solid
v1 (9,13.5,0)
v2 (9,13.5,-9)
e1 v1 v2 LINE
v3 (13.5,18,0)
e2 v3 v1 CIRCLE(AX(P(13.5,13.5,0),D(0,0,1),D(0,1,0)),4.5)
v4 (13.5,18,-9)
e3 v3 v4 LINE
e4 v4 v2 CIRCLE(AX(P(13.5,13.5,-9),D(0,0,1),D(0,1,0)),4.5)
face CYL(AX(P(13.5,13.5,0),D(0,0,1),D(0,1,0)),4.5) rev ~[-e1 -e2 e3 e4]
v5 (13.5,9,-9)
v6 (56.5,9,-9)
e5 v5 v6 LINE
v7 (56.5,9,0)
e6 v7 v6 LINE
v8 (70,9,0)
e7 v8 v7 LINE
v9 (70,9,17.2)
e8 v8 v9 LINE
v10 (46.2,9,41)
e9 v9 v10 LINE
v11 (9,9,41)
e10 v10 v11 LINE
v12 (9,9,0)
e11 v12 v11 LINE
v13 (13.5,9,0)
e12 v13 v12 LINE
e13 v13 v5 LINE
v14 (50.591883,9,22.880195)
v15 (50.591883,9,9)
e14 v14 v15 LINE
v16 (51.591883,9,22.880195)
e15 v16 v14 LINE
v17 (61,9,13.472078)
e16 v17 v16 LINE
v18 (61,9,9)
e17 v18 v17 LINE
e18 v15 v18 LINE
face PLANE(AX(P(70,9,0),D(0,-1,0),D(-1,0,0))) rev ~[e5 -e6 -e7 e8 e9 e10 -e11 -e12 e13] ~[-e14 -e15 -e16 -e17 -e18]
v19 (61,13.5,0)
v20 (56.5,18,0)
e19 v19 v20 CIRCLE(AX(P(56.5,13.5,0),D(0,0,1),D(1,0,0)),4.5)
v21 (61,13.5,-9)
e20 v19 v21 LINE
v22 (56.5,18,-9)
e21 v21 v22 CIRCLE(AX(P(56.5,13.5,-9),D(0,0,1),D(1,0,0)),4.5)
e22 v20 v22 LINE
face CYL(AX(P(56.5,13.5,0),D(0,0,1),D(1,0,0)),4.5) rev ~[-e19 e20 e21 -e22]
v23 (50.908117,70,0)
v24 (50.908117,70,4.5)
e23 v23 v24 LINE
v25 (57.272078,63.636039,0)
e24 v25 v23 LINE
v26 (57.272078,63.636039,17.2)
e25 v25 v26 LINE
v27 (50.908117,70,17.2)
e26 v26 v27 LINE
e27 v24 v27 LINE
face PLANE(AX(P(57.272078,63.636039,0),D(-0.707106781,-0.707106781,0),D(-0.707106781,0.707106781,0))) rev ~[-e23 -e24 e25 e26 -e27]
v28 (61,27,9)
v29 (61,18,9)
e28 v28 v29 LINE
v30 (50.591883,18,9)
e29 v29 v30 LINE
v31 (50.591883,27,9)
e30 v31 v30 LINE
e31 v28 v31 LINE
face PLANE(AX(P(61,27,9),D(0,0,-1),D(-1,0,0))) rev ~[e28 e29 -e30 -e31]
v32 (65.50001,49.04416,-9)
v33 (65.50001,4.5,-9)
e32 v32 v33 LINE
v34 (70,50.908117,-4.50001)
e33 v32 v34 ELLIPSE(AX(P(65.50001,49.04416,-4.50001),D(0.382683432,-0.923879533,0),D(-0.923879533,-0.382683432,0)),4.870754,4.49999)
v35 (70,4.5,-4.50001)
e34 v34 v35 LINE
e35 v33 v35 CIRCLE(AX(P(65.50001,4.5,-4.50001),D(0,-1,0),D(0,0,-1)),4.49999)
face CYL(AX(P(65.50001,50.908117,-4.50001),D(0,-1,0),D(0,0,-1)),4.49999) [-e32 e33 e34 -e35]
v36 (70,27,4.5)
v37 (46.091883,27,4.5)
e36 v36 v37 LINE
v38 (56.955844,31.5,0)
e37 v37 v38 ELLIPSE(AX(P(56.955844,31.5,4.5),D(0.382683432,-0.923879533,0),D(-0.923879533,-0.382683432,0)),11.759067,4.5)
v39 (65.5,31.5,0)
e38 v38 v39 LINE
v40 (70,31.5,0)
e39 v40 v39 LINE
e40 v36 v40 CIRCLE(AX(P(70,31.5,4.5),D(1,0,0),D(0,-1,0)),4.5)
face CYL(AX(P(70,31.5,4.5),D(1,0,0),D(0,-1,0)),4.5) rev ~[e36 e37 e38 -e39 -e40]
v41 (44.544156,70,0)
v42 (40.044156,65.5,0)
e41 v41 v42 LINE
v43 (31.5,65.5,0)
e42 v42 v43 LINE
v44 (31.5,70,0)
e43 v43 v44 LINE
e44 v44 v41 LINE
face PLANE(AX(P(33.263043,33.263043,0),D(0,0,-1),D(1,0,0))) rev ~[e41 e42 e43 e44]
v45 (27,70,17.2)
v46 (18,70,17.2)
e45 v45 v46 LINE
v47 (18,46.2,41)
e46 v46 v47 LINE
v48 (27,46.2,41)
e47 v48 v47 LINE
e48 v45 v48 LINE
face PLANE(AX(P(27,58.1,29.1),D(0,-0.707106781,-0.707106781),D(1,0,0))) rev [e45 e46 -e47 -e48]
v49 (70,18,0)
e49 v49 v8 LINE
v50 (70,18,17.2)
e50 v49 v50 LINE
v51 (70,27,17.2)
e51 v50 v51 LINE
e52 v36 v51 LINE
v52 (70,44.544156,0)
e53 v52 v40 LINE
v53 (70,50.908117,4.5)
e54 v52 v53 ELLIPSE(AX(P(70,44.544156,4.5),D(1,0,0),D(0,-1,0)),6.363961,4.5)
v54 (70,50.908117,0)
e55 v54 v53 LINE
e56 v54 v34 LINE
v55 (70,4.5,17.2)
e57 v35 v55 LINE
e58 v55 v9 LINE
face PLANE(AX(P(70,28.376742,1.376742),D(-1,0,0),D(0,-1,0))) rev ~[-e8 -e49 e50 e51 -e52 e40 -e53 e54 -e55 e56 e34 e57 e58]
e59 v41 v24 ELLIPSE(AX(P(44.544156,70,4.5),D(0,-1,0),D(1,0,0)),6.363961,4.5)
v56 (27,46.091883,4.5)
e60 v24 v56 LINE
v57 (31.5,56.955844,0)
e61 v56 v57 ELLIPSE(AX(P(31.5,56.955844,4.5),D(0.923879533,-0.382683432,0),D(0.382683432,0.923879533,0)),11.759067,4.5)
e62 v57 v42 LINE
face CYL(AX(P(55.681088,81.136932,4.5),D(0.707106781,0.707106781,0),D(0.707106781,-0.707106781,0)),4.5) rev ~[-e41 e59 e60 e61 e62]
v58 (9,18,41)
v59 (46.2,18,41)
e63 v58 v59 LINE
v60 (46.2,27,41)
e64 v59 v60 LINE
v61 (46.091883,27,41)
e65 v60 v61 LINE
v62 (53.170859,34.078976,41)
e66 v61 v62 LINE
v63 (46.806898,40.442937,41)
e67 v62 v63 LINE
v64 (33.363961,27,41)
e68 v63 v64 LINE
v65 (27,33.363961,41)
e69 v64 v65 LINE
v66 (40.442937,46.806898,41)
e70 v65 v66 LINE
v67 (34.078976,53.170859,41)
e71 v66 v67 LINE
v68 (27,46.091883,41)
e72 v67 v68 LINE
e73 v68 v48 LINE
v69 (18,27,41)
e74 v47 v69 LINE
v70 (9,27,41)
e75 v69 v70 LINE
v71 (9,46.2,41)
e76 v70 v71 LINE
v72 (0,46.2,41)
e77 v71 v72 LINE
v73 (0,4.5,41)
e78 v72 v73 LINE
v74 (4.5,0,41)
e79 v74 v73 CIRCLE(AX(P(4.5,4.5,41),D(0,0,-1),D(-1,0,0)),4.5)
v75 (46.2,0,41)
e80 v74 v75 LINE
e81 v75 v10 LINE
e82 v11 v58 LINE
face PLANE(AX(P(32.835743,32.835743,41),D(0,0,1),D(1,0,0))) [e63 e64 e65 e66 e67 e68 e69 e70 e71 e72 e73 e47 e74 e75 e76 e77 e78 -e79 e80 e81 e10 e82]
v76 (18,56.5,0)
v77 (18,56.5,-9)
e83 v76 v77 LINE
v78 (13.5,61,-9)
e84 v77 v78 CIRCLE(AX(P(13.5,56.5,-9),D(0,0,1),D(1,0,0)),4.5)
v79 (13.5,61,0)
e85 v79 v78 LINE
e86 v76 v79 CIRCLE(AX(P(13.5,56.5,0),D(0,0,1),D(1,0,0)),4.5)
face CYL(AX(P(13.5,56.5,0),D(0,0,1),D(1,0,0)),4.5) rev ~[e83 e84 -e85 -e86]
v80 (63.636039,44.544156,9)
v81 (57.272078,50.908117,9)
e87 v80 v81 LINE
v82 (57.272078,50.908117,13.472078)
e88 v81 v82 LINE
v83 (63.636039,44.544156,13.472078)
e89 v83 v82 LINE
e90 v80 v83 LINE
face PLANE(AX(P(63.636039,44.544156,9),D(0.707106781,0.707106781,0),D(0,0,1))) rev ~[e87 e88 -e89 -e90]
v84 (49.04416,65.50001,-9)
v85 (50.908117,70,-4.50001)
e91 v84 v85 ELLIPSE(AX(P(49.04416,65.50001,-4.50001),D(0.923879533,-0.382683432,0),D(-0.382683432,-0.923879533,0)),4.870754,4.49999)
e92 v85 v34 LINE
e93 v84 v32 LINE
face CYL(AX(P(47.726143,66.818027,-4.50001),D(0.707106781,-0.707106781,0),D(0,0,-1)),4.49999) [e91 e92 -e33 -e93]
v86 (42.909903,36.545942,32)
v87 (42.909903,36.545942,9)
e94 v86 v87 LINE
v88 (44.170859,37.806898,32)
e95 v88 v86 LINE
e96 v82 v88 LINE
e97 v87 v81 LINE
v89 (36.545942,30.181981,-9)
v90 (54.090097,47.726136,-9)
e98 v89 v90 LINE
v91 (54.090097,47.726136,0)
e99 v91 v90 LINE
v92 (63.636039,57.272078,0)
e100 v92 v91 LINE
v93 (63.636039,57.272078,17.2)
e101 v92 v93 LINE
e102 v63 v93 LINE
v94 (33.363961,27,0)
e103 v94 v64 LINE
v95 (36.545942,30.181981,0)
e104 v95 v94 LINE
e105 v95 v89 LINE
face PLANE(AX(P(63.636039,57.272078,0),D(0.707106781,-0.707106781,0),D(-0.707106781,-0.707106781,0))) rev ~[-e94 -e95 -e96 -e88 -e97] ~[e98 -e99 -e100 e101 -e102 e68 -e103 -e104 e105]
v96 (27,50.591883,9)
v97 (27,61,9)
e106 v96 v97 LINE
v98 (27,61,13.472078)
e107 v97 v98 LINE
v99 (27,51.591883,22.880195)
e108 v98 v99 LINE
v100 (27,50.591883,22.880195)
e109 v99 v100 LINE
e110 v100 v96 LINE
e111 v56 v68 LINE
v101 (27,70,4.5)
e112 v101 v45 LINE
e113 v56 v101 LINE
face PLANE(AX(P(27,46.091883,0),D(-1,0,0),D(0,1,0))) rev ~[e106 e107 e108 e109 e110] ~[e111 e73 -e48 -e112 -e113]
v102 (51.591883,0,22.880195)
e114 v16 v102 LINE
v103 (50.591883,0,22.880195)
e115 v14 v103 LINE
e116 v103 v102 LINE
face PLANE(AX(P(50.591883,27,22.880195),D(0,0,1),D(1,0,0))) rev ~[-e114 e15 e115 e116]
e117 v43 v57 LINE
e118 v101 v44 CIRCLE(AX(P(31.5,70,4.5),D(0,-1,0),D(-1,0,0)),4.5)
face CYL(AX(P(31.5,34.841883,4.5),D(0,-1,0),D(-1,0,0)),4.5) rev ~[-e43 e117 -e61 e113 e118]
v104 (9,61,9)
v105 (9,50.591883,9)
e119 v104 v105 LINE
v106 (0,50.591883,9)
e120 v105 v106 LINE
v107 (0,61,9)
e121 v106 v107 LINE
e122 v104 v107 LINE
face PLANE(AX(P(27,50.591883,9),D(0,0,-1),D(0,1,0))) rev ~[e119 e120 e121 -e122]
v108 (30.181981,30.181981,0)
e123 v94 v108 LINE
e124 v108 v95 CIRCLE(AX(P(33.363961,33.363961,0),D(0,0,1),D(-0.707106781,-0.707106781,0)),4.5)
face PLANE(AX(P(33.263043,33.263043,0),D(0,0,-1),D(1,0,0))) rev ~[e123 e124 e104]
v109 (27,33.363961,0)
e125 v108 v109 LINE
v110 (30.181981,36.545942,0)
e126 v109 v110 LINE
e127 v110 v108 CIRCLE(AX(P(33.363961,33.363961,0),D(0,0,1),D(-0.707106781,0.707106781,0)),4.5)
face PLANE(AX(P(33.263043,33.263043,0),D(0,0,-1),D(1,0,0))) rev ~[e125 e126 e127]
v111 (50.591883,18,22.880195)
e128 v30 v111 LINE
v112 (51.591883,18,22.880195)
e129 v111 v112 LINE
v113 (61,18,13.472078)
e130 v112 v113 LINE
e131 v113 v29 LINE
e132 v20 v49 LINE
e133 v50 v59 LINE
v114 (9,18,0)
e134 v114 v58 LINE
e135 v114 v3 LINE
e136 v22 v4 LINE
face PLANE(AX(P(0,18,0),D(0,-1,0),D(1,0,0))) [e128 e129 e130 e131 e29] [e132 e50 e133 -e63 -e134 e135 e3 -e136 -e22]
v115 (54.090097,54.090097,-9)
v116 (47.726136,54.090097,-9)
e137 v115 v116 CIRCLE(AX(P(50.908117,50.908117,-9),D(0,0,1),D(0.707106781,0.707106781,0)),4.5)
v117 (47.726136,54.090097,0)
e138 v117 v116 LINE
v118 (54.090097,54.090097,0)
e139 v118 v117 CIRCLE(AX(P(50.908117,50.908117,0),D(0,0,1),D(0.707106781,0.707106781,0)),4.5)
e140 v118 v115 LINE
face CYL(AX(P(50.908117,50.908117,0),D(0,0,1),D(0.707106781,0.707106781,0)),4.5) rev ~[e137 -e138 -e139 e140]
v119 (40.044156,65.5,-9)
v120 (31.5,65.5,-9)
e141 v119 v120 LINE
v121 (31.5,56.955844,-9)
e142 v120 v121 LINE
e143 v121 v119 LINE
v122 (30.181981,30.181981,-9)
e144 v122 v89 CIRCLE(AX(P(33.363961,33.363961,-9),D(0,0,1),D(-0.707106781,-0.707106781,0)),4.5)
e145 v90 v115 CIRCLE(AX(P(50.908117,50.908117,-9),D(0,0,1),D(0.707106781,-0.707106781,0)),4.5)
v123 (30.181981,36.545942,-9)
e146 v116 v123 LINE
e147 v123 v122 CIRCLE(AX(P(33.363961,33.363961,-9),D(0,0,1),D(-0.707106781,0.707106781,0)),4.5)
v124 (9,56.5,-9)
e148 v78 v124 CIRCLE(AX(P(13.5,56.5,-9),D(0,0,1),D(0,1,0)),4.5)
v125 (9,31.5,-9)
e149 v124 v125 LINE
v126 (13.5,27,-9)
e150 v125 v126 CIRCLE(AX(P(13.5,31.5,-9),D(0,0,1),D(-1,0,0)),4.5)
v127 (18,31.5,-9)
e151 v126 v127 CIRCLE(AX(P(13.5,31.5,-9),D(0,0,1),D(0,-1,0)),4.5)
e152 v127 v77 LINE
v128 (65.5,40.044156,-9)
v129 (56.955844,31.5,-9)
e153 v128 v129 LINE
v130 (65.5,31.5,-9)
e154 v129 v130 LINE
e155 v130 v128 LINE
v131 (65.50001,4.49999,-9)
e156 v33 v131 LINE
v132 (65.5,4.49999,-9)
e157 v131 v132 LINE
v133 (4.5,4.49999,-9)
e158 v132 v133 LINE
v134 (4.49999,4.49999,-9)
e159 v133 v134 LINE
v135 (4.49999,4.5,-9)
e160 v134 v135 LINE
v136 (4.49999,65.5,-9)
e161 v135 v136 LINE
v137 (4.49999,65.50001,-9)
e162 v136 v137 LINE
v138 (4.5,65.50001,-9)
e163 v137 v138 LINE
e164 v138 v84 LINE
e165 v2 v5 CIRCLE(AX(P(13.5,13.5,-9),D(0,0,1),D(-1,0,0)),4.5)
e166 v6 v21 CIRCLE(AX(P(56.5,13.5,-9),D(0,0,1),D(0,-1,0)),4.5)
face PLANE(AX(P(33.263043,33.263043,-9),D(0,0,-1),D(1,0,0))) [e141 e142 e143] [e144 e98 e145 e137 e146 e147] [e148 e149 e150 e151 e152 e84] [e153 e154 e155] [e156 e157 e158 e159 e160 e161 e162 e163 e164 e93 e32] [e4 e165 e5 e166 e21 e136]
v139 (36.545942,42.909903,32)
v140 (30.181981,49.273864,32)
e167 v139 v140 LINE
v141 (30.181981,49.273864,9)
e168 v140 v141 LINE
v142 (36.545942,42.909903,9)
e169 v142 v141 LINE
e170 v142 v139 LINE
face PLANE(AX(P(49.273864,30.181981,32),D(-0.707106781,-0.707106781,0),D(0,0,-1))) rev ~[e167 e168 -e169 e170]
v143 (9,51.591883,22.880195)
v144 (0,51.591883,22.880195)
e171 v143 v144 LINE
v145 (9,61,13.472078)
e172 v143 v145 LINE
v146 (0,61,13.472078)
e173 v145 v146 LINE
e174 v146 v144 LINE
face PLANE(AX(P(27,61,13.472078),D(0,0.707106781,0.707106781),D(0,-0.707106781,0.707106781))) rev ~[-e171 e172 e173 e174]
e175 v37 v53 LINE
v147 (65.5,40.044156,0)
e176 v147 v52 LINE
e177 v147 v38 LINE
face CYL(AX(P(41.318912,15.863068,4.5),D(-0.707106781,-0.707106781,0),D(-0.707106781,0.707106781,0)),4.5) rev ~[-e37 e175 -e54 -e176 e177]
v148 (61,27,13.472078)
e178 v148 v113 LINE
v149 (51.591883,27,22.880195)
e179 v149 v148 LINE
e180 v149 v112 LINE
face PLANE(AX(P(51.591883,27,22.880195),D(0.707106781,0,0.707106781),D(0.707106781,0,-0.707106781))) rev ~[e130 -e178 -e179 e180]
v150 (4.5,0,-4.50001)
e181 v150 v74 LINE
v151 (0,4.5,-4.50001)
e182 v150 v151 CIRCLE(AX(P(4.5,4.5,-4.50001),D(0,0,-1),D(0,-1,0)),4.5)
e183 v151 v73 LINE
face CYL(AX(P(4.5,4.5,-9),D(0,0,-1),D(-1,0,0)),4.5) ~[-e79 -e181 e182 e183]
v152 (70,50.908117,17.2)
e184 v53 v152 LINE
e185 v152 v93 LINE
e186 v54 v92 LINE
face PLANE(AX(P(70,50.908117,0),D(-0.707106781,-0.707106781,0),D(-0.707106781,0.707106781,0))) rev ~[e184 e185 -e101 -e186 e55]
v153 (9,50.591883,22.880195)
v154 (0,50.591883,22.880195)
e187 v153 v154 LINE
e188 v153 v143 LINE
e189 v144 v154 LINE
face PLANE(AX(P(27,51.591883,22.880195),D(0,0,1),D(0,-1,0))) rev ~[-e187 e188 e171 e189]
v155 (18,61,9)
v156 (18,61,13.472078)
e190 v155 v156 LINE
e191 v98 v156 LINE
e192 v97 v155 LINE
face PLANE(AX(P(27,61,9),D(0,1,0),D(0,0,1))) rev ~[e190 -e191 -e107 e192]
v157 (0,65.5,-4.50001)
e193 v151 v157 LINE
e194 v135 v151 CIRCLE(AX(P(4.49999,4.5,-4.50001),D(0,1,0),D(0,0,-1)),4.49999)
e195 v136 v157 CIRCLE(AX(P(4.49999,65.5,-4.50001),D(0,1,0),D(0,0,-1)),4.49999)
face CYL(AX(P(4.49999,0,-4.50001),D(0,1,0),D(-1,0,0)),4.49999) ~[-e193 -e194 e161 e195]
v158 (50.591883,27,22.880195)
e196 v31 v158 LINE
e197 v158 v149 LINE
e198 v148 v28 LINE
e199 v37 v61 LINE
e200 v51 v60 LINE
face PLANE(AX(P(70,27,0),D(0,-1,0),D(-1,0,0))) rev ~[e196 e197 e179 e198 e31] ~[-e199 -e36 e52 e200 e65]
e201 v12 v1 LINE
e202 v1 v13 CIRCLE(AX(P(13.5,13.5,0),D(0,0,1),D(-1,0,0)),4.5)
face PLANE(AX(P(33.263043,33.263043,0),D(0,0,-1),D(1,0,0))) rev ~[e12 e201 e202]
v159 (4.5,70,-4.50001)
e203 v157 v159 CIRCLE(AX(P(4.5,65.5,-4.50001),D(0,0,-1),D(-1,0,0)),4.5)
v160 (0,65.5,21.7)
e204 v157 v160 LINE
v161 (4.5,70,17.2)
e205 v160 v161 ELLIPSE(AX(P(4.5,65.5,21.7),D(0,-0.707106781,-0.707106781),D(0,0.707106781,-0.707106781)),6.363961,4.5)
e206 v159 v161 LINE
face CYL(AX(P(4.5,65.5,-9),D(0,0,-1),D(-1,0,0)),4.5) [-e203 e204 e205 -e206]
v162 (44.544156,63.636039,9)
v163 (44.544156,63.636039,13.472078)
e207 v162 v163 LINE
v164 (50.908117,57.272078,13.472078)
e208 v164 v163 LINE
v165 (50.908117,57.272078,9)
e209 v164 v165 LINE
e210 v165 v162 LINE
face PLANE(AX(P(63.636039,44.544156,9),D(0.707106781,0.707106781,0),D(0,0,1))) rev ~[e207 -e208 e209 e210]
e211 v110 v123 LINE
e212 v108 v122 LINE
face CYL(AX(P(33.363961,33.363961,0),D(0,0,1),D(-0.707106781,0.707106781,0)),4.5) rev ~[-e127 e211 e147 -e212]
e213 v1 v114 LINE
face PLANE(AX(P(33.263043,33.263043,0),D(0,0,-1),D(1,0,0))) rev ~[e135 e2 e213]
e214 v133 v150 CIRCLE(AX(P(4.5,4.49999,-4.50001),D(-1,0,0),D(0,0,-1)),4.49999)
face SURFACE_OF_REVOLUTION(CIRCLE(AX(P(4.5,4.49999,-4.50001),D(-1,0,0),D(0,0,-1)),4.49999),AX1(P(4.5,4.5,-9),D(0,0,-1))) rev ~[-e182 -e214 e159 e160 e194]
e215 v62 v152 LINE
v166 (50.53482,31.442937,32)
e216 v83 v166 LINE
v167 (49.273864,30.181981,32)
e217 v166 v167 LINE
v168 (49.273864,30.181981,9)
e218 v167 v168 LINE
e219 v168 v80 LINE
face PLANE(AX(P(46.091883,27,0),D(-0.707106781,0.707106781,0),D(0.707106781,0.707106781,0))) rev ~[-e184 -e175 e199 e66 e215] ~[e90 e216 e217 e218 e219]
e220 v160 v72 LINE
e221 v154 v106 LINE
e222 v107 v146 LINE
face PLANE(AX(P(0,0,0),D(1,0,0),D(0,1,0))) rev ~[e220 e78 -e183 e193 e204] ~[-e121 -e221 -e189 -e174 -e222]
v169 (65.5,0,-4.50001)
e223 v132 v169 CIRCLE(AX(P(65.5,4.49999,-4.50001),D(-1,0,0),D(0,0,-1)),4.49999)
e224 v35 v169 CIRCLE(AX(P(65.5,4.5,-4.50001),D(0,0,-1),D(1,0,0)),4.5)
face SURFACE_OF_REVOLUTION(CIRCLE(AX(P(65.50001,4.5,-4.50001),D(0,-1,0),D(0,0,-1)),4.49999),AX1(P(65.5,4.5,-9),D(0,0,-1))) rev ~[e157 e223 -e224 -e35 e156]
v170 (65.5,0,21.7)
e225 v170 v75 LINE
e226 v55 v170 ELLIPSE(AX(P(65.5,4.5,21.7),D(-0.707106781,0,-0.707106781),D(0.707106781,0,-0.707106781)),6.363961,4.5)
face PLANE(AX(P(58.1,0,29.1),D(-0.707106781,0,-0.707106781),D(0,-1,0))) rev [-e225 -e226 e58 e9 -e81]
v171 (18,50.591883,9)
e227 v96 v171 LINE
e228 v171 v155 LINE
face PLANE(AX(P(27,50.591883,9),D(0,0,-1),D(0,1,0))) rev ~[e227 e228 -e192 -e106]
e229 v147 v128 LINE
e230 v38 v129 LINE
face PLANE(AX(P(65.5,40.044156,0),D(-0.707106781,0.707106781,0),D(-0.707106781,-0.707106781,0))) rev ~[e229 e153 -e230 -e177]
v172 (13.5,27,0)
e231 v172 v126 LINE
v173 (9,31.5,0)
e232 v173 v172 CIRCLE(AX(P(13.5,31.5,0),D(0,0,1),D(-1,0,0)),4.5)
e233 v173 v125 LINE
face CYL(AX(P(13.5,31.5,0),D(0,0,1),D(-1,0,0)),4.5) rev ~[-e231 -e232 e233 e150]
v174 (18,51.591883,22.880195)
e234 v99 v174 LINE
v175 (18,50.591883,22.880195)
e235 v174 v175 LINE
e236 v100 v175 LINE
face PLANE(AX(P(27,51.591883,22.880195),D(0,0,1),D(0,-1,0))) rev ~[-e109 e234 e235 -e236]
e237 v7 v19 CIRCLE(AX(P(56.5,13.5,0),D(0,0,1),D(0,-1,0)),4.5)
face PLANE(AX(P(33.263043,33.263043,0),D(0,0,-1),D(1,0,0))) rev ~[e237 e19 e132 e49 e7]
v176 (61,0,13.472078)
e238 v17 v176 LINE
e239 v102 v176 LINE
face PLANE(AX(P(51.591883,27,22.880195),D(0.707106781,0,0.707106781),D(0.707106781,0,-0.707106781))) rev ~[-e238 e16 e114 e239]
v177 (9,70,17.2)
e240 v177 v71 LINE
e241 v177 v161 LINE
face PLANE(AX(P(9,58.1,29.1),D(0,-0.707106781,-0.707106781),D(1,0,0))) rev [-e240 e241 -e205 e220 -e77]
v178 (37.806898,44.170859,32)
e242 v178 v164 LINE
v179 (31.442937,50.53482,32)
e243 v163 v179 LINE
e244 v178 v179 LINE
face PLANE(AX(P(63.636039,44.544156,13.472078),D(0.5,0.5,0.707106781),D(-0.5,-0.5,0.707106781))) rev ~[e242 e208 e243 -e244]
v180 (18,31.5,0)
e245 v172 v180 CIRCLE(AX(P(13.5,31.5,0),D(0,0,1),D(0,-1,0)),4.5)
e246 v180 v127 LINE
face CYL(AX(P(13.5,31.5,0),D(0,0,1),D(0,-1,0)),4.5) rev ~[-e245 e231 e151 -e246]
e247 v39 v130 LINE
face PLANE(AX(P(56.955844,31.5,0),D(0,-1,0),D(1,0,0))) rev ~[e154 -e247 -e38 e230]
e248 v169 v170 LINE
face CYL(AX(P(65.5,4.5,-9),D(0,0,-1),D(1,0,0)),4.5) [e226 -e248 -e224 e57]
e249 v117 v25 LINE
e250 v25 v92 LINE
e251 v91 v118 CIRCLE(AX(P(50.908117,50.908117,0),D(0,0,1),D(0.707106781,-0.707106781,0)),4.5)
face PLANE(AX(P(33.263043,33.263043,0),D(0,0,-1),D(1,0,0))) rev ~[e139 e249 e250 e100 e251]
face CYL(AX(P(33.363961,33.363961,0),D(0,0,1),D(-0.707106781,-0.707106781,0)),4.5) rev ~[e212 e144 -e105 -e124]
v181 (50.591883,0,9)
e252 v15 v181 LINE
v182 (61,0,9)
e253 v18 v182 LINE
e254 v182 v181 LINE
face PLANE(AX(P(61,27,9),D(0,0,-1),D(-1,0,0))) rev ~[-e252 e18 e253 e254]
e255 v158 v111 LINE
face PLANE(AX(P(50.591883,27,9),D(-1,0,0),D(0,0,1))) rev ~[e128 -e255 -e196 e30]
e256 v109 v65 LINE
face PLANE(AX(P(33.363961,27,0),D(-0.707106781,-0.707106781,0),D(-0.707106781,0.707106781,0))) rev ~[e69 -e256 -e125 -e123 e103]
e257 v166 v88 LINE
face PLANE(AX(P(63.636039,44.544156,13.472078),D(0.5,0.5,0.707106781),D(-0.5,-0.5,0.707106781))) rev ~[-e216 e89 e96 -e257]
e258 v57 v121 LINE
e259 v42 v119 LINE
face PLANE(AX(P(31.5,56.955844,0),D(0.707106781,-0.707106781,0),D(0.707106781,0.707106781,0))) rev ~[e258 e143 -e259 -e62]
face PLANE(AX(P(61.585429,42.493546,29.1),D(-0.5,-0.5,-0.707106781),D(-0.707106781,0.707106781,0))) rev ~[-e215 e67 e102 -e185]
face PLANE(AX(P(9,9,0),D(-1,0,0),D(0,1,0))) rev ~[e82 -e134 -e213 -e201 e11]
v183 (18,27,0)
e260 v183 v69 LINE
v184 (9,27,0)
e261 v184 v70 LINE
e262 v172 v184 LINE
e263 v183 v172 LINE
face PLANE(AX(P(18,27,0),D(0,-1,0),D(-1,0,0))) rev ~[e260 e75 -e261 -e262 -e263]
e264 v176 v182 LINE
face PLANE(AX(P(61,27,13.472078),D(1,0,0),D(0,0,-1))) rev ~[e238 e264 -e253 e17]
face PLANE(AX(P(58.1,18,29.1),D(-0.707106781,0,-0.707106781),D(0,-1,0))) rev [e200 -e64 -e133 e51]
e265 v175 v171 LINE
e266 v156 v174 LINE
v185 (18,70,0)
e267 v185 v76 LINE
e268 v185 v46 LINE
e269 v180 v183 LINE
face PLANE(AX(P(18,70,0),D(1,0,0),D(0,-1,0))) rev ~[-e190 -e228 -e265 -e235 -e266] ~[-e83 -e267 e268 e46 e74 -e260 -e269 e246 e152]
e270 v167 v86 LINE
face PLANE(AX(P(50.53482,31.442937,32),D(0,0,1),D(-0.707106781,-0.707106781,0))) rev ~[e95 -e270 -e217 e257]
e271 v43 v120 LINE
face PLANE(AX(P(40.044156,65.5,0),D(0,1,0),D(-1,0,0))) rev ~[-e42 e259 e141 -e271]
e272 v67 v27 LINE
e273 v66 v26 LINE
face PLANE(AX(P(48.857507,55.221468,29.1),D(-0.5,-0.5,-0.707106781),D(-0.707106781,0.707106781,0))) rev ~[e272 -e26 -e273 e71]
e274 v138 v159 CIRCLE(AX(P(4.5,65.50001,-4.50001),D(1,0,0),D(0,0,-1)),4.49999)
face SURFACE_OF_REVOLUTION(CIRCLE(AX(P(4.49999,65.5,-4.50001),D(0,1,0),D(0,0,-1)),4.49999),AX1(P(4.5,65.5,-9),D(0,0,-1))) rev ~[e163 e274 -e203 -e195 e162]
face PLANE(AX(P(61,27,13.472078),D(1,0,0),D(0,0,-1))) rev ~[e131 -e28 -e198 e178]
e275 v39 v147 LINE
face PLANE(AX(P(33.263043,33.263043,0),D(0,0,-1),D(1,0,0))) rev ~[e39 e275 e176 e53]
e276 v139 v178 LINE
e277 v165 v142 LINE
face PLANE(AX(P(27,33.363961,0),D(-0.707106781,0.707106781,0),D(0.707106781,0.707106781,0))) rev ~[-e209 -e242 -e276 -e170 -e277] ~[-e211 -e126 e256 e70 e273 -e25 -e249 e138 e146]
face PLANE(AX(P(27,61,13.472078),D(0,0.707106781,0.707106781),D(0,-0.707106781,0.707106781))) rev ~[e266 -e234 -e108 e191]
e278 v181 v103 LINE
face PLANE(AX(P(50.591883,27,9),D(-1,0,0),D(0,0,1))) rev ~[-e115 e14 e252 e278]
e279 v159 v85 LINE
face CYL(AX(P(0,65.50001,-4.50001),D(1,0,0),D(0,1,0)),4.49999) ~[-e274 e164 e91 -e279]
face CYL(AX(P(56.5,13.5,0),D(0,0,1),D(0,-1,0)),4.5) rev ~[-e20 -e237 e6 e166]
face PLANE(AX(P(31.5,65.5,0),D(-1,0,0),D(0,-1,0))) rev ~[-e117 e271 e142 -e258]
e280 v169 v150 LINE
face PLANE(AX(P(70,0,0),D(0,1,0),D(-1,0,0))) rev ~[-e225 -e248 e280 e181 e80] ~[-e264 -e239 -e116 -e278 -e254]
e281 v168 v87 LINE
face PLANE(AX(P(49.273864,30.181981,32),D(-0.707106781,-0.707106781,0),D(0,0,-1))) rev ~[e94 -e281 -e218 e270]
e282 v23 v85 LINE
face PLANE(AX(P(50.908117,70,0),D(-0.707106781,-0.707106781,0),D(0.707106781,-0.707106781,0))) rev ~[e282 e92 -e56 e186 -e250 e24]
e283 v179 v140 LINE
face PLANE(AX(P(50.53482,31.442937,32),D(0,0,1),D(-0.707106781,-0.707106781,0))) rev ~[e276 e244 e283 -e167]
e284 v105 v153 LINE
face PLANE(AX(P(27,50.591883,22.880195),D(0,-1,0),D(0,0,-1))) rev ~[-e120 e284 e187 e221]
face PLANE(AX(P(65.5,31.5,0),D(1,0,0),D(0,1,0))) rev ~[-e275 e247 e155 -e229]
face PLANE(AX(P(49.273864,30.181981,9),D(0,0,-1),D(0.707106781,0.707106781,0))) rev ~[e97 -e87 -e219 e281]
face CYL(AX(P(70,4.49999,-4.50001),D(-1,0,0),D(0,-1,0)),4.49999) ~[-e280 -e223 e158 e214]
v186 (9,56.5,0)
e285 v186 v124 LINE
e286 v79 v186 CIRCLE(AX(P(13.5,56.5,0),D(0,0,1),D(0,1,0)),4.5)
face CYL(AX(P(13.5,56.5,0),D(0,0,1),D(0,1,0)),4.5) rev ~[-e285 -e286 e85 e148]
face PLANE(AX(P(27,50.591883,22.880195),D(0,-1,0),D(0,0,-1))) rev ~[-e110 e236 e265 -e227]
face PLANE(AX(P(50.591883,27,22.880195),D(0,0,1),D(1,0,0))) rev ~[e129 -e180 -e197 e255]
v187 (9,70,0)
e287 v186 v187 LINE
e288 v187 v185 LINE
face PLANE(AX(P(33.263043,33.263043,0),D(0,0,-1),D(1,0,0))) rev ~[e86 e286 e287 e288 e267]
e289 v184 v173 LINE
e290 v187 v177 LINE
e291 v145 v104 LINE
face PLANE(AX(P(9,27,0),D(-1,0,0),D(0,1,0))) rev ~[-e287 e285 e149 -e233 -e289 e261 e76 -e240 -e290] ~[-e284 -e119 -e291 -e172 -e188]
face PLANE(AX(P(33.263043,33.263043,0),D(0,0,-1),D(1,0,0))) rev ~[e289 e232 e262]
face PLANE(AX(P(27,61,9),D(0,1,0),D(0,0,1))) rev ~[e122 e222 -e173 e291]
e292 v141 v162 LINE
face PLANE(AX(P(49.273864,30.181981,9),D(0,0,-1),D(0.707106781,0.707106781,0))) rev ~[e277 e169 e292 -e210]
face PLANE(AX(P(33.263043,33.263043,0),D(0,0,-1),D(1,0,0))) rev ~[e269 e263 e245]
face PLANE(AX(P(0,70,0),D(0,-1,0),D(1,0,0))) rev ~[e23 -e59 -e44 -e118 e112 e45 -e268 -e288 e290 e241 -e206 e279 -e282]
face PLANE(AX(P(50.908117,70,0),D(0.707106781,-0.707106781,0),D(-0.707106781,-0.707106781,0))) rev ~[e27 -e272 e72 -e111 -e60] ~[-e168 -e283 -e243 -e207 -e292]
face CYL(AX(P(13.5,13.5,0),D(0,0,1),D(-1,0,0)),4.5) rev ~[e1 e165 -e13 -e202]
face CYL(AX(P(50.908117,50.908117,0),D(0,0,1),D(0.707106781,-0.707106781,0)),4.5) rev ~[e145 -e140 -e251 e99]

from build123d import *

# Parameters (mm, degrees)
F1_DEPTH      = 41
F3_DEPTH      = 9
F4_SIZE       = 23.8
F5_SIZE       = 23.8
F7_DEPTH      = 9
F9_DEPTH      = 28.2
F11_DEPTH     = 34.5
F13_DEPTH     = 32.2
F14_R         = 4.49999
F15_T4_DEPTH  = 56.311183182
F15_T10_DEPTH = 35.158116908
F15_T15_DEPTH = 56.311183182
F15_T21_DEPTH = 35.158116908
F15_T23_DEPTH = 61.25
F15_T25_DEPTH = 37.45
F15_T28_ANGLE = 90
F15_T30_ANGLE = 90
F15_T32_ANGLE = 90


# Not quite as in the source:
# - a fillet or chamfer that OpenCascade refuses, or shapes differently, is made with other operations: its cross-section is extruded or revolved along the edge and cut away or added
# - a fillet or chamfer is up to 0.001 mm smaller than in the source, because OpenCascade refuses the exact size


with BuildPart() as f1:
    # F0 (on Top) → F1 (new body)
    with BuildSketch(Plane.XY):
        Polygon((0, 70), (0, 0), (70, 0), (70, 9), (9, 9), (9, 18), (70, 18), (70, 27), (46.091883092, 27), (70, 50.908116908), (63.6360389693, 57.2720779386), (33.3639610307, 27), (27, 33.3639610307), (57.2720779386, 63.6360389693), (50.908116908, 70), (27, 46.091883092), (27, 70), (18, 70), (18, 27), (9, 27), (9, 70), align=None)
    extrude(amount=F1_DEPTH)

    # F2 (on face) → F3 (join)
    with BuildSketch(Plane(origin=(0, 0, 0), x_dir=(1, 0, 0), z_dir=(0, 0, -1))):
        Polygon((70, -50.908116908), (70, 0), (0, 0), (0, -70), (50.908116908, -70), align=None)
    extrude(amount=F3_DEPTH)

    # F4
    f4_edges = [f1.edges().sort_by_distance(p)[0] for p in [
        (70, 4.5, 41),
        (70, 22.5, 41),
        (22.5, 70, 41),
        (4.5, 70, 41),
    ]]
    chamfer(f4_edges, length=F4_SIZE)

    # F5
    f5_edges = [f1.edges().sort_by_distance(p)[0] for p in [
        (66.818019, 54.090097, 41),
        (54.090097, 66.818019, 41),
    ]]
    chamfer(f5_edges, length=F5_SIZE)

    # F6 (on face) → F7 (cut, through all)
    with BuildSketch(Plane.XY):
        with BuildLine():
            Line((9, 56.5), (9, 31.5))
            ThreePointArc((9, 31.5), (10.3180194847, 28.3180194847), (13.5, 27))
            ThreePointArc((13.5, 27), (16.6819805153, 28.3180194847), (18, 31.5))
            Line((18, 31.5), (18, 56.5))
            ThreePointArc((18, 56.5), (16.6819805153, 59.6819805153), (13.5, 61))
            ThreePointArc((13.5, 61), (10.3180194847, 59.6819805153), (9, 56.5))
        make_face()
        with BuildLine():
            Line((56.5, 18), (13.5, 18))
            ThreePointArc((13.5, 18), (10.3180194847, 16.6819805153), (9, 13.5))
            ThreePointArc((9, 13.5), (10.3180194847, 10.3180194847), (13.5, 9))
            Line((13.5, 9), (56.5, 9))
            ThreePointArc((56.5, 9), (59.6819805153, 10.3180194847), (61, 13.5))
            ThreePointArc((61, 13.5), (59.6819805153, 16.6819805153), (56.5, 18))
        make_face()
        with BuildLine():
            Line((47.7261363926, 54.0900974233), (30.1819805153, 36.545941546))
            ThreePointArc((30.1819805153, 36.545941546), (28.8639610307, 33.3639610307), (30.1819805153, 30.1819805153))
            ThreePointArc((30.1819805153, 30.1819805153), (33.3639610307, 28.8639610307), (36.545941546, 30.1819805153))
            Line((36.545941546, 30.1819805153), (54.0900974233, 47.7261363926))
            ThreePointArc((54.0900974233, 47.7261363926), (55.408116908, 50.908116908), (54.0900974233, 54.0900974233))
            ThreePointArc((54.0900974233, 54.0900974233), (50.908116908, 55.408116908), (47.7261363926, 54.0900974233))
        make_face()
        Polygon((40.0441558773, 65.5), (31.5, 65.5), (31.5, 56.9558441227), align=None)
        Polygon((65.5, 40.0441558773), (56.9558441227, 31.5), (65.5, 31.5), align=None)
    extrude(amount=-F7_DEPTH, mode=Mode.SUBTRACT)

    # F8 (on face) → F9 (cut)
    with BuildSketch(Plane(origin=(9.545941546, -9.545941546, 0), x_dir=(0.7071067812, 0.7071067812, 0), z_dir=(0.7071067812, -0.7071067812, 0))):
        Polygon((56.1837661841, 32), (56.1837661841, 9), (76.4949493661, 9), (76.4949493661, 13.4720779386), (57.9670273048, 32), align=None)
    extrude(amount=-F9_DEPTH, mode=Mode.SUBTRACT)

    # F10 (on face) → F11 (cut)
    with BuildSketch(Plane.YZ.offset(27)):
        Polygon((50.591883092, 22.8801948466), (50.591883092, 9), (61, 9), (61, 13.4720779386), (51.591883092, 22.8801948466), align=None)
    extrude(amount=-F11_DEPTH, mode=Mode.SUBTRACT)

    # F12 (on face) → F13 (cut)
    with BuildSketch(Plane(origin=(0, 27, 0), x_dir=(-1, 0, 0), z_dir=(0, 1, 0))):
        Polygon((-61, 13.4720779386), (-61, 9), (-50.591883092, 9), (-50.591883092, 22.8801948466), (-51.591883092, 22.8801948466), align=None)
    extrude(amount=-F13_DEPTH, mode=Mode.SUBTRACT)

    # F14 (radius 4.5 in the source; OpenCascade refuses exactly that, so slightly less here)
    f14_edges = [f1.edges().sort_by_distance(p)[0] for p in [
        (35, 0, -9),
        (70, 25.454058, -9),
        (60.454058, 60.454058, -9),
        (25.454058, 70, -9),
        (0, 35, -9),
    ]]
    fillet(f14_edges, radius=F14_R)

    # F15: fillet of radius 4.5 on 7 edges, made by hand


with BuildPart() as f15_tool2:
    # F15_s3 → F15_t4 (new body)
    with BuildSketch(Plane(origin=(28.5909902577, 28.5909902577, 0), x_dir=(0, 0, 1), z_dir=(0.7071067812, 0.7071067812, 0))):
        with BuildLine():
            ThreePointArc((4.5, 13.5), (1.3180194847, 14.8180194847), (0, 18))
            Line((0, 18), (0, 13.5))
            Line((0, 13.5), (4.5, 13.5))
        make_face()
    extrude(amount=F15_T4_DEPTH)

    split(bisect_by=Plane.YZ.offset(70), keep=Keep.BOTTOM)

    split(bisect_by=Plane.XZ.offset(-18), keep=Keep.BOTTOM)


with BuildPart() as f1_1:
    add(f1.part)

    # F15_t1: union F15_tool2
    add(f15_tool2.part)


with BuildPart() as f15_tool8:
    # F15_s9 → F15_t10 (new body)
    with BuildSketch(Plane.YZ.offset(70)):
        with BuildLine():
            ThreePointArc((27, 4.5), (28.3180194847, 1.3180194847), (31.5, 0))
            Line((31.5, 0), (27, 0))
            Line((27, 0), (27, 4.5))
        make_face()
    extrude(amount=-F15_T10_DEPTH)

    split(bisect_by=Plane(origin=(9.545941546, -9.545941546, 0), x_dir=(0, 0, 1), z_dir=(0.7071067812, -0.7071067812, 0)), keep=Keep.TOP)


with BuildPart() as f1_2:
    add(f1_1.part)

    # F15_t7: union F15_tool8
    add(f15_tool8.part)


with BuildPart() as f15_tool13:
    # F15_s14 → F15_t15 (new body)
    with BuildSketch(Plane(origin=(68.4090097423, 68.4090097423, 0), x_dir=(0, 0, 1), z_dir=(-0.7071067812, -0.7071067812, 0))):
        with BuildLine():
            ThreePointArc((4.5, 13.5), (1.3180194847, 14.8180194847), (0, 18))
            Line((0, 18), (0, 13.5))
            Line((0, 13.5), (4.5, 13.5))
        make_face()
    extrude(amount=F15_T15_DEPTH)

    split(bisect_by=Plane.XZ.offset(-70), keep=Keep.TOP)

    split(bisect_by=Plane.YZ.offset(18), keep=Keep.TOP)


with BuildPart() as f1_3:
    add(f1_2.part)

    # F15_t12: union F15_tool13
    add(f15_tool13.part)


with BuildPart() as f15_tool19:
    # F15_s20 → F15_t21 (new body)
    with BuildSketch(Plane.XZ.offset(-34.841883092)):
        with BuildLine():
            ThreePointArc((27, 4.5), (28.3180194847, 1.3180194847), (31.5, 0))
            Line((31.5, 0), (27, 0))
            Line((27, 0), (27, 4.5))
        make_face()
    extrude(amount=-F15_T21_DEPTH)

    split(bisect_by=Plane(origin=(-3.1819805153, 3.1819805153, 0), x_dir=(0, 0, 1), z_dir=(-0.7071067812, 0.7071067812, 0)), keep=Keep.TOP)


with BuildPart() as f1_4:
    add(f1_3.part)

    # F15_t18: union F15_tool19
    add(f15_tool19.part)

    # F15_s24 → F15_t23 (cut)
    with BuildSketch(Plane.XY.offset(-9)):
        with BuildLine():
            ThreePointArc((0, 4.5), (1.3180194847, 1.3180194847), (4.5, 0))
            Line((4.5, 0), (0, 0))
            Line((0, 0), (0, 4.5))
        make_face()
    extrude(amount=F15_T23_DEPTH, mode=Mode.SUBTRACT)

    # F15_s26 → F15_t25 (cut)
    with BuildSketch(Plane.XY.offset(-9)):
        with BuildLine():
            ThreePointArc((70, 4.5), (68.6819805153, 1.3180194847), (65.5, 0))
            Line((65.5, 0), (70, 0))
            Line((70, 0), (70, 4.5))
        make_face()
        with BuildLine():
            ThreePointArc((0, 65.5), (1.3180194847, 68.6819805153), (4.5, 70))
            Line((4.5, 70), (0, 70))
            Line((0, 70), (0, 65.5))
        make_face()
    extrude(amount=F15_T25_DEPTH, mode=Mode.SUBTRACT)

    # F15_s27 → F15_t28 (revolve, cut)
    with BuildSketch(Plane.XZ.offset(-65.5)):
        with BuildLine():
            ThreePointArc((4.49999, -9), (1.3180165557, -7.6819834443), (0, -4.50001))
            Line((0, -4.50001), (0, -9))
            Line((0, -9), (4.49999, -9))
        make_face()
    revolve(axis=Axis((4.5, 65.5, -9), (0, 0, -1)), revolution_arc=F15_T28_ANGLE, mode=Mode.SUBTRACT)

    # F15_s29 → F15_t30 (revolve, cut)
    with BuildSketch(Plane.XZ.offset(-4.5)):
        with BuildLine():
            ThreePointArc((65.50001, -9), (68.6819834443, -7.6819834443), (70, -4.50001))
            Line((70, -4.50001), (70, -9))
            Line((70, -9), (65.50001, -9))
        make_face()
    revolve(axis=Axis((65.5, 4.5, -9), (0, 0, -1)), revolution_arc=F15_T30_ANGLE, mode=Mode.SUBTRACT)

    # F15_s31 → F15_t32 (revolve, cut)
    with BuildSketch(Plane.YZ.offset(4.5)):
        with BuildLine():
            ThreePointArc((4.49999, -9), (1.3180165557, -7.6819834443), (0, -4.50001))
            Line((0, -4.50001), (0, -9))
            Line((0, -9), (4.49999, -9))
        make_face()
    revolve(axis=Axis((4.5, 4.5, -9), (0, 0, -1)), revolution_arc=F15_T32_ANGLE, mode=Mode.SUBTRACT)


solid = f1_4.part
